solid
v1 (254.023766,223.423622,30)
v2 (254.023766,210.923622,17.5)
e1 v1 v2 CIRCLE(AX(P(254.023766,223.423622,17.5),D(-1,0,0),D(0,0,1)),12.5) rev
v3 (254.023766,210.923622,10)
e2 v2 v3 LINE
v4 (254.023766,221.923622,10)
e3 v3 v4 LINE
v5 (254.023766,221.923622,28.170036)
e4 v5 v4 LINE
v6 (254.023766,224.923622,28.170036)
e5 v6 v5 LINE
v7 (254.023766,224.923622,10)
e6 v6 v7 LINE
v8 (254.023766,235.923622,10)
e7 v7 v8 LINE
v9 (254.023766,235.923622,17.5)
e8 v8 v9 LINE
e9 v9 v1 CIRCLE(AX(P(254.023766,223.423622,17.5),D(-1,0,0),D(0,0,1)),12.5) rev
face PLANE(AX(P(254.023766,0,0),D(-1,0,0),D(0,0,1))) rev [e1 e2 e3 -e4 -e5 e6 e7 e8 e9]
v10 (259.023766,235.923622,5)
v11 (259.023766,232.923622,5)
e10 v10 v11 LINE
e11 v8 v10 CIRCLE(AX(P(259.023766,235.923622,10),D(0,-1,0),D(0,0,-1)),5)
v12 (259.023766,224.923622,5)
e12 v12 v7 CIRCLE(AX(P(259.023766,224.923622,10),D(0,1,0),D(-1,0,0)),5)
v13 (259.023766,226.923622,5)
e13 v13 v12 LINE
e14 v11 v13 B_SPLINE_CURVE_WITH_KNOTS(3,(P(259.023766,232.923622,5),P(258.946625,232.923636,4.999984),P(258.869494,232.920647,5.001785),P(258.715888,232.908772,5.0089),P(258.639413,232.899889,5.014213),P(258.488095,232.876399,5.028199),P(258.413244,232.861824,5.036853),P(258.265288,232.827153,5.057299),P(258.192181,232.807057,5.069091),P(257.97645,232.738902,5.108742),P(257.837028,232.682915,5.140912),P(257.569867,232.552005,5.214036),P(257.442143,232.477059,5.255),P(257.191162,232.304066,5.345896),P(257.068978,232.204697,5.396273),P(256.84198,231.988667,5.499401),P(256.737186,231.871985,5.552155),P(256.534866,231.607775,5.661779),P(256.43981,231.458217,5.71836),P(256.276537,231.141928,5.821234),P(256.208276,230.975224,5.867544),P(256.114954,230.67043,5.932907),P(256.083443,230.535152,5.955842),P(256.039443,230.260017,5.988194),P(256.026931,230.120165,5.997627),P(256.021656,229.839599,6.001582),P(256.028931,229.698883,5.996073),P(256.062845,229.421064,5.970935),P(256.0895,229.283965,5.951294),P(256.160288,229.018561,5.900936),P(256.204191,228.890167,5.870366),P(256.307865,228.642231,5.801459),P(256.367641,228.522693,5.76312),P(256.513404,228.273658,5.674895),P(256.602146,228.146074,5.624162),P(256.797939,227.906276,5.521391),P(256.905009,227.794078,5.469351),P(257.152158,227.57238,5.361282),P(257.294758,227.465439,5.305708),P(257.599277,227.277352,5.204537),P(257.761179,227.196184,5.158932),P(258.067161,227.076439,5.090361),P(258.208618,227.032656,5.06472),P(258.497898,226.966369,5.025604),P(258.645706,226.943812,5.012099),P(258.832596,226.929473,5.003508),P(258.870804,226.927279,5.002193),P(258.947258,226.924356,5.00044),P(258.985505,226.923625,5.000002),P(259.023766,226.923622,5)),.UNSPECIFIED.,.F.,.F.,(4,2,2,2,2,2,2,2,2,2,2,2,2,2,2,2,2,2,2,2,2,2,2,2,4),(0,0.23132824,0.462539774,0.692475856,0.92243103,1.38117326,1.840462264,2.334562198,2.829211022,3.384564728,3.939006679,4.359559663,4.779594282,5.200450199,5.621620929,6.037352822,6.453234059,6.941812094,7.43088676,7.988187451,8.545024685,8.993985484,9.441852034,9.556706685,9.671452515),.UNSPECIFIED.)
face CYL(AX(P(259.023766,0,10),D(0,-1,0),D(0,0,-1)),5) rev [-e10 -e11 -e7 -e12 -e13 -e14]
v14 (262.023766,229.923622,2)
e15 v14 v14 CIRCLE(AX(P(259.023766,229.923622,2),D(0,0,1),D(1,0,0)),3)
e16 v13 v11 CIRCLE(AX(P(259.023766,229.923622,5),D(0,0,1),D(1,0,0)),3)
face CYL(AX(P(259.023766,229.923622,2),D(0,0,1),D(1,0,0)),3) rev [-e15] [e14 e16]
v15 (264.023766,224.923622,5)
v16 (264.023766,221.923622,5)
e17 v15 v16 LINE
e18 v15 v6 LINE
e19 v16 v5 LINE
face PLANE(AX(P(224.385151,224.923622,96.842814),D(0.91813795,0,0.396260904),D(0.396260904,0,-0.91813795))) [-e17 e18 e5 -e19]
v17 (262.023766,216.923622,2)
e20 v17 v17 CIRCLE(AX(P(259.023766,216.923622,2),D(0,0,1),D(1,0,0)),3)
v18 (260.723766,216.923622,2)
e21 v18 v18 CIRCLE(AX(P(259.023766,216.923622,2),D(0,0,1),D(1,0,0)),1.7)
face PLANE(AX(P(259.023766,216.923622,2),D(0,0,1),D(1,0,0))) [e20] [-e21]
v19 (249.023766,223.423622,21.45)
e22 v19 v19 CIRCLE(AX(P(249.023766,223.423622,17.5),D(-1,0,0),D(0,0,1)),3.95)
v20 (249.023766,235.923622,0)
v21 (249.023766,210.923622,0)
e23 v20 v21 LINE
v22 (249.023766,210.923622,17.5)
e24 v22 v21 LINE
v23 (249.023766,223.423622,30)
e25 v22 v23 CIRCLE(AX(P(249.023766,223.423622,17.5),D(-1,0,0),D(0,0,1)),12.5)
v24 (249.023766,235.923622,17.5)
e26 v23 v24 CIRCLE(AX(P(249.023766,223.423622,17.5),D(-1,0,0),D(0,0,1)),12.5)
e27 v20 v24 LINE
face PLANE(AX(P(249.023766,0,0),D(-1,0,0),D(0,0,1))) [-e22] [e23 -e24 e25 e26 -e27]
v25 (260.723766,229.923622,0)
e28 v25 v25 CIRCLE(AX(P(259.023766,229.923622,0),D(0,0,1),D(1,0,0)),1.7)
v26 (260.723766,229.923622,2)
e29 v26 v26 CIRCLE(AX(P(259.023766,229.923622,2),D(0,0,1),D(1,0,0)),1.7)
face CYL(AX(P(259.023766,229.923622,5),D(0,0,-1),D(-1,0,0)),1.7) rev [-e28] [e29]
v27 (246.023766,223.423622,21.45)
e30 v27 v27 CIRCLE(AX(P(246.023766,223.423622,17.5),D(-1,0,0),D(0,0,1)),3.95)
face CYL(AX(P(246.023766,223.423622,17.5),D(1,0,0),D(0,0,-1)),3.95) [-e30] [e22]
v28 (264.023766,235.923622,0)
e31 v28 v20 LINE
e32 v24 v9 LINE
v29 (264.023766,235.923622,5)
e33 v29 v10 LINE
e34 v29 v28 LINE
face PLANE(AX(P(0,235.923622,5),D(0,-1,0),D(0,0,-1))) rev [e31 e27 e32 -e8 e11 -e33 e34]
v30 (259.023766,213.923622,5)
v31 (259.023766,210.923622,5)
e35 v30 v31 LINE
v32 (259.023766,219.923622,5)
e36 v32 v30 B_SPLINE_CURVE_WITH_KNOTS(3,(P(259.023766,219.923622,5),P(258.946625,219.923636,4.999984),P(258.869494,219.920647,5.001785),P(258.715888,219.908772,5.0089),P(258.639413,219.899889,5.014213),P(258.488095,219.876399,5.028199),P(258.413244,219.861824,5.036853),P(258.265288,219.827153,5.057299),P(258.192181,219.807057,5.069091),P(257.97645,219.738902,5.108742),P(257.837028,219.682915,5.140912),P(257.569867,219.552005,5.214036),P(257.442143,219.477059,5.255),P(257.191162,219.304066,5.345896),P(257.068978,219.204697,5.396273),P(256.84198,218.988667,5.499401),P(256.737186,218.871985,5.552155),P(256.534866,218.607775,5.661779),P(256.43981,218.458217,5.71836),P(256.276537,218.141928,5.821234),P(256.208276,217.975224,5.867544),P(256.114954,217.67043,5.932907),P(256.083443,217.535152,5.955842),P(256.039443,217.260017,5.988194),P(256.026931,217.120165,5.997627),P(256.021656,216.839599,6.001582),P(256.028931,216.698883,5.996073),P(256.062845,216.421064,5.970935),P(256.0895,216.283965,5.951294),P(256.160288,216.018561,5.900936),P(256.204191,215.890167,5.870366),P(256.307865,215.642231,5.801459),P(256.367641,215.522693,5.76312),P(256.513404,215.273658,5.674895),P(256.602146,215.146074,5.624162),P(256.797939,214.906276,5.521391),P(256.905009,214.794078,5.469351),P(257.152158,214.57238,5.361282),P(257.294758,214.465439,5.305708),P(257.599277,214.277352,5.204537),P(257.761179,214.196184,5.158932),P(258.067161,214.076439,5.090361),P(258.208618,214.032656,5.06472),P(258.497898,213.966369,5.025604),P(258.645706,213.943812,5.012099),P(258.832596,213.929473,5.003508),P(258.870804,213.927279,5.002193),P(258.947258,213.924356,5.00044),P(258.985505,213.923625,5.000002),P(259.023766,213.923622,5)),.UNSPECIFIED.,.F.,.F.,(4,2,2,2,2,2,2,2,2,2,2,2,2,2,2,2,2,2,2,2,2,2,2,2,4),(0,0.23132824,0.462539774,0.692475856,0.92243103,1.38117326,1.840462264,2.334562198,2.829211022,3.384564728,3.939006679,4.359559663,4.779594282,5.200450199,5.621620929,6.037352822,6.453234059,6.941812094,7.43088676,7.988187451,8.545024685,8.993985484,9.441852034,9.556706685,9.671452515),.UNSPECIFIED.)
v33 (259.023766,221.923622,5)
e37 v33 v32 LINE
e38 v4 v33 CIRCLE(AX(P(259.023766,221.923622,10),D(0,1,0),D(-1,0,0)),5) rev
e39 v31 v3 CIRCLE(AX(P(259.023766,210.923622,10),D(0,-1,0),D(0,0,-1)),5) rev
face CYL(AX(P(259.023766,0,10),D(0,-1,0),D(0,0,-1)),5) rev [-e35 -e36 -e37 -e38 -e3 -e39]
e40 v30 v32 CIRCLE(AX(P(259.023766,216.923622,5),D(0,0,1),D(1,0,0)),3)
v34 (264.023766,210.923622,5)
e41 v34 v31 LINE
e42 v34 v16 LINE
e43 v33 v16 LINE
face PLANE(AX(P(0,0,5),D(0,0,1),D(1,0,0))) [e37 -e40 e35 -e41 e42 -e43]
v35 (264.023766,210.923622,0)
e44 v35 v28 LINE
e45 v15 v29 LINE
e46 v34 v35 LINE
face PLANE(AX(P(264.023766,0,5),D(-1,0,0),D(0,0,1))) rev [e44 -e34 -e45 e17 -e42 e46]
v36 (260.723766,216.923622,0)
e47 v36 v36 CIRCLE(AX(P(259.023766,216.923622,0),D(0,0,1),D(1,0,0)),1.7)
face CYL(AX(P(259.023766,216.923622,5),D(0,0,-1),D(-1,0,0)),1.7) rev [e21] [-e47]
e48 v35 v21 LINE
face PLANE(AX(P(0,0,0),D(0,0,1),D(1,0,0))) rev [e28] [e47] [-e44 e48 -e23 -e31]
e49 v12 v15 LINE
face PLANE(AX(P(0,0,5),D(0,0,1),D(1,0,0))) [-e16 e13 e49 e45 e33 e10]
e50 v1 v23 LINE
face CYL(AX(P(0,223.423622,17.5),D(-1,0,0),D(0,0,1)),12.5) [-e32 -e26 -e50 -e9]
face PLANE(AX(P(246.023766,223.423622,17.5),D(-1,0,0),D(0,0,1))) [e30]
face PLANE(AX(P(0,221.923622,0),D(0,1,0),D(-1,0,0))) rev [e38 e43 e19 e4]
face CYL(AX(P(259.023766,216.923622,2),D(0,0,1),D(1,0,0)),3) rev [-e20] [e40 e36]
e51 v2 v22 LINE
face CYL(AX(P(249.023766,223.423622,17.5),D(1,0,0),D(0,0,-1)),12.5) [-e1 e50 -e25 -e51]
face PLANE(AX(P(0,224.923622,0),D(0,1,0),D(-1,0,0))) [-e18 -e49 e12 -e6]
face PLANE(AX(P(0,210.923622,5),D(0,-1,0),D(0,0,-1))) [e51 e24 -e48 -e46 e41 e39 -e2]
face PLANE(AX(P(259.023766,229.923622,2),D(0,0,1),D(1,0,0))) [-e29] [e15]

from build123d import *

# Parameters (mm, degrees)
SKETCH1_W           = 10
SKETCH1_H           = 25
SKETCH1_R           = 1.7
BOSS_EXTRUDE1_DEPTH = 5
SKETCH2_W           = 25
SKETCH2_H           = 25
SKETCH2_W_2         = 5
BOSS_EXTRUDE2_DEPTH = 5
SKETCH3_R           = 3.95
BOSS_EXTRUDE3_DEPTH = 3
SKETCH4_R           = 3
CUT_EXTRUDE1_DEPTH  = 3
FILLET1_R           = 12.5
BOSS_EXTRUDE4_DEPTH = 1.5
FILLET2_R           = 5


# Some blends are built 0.0001 mm under size
with BuildPart() as part:
    # Sketch1 → Boss-Extrude1 (new body)
    with BuildSketch(Plane.XY):
        with Locations((259.023766163, 223.42362241)):
            Rectangle(SKETCH1_W, SKETCH1_H)
        with Locations((259.023766163, 229.92362241)):
            Circle(SKETCH1_R, mode=Mode.SUBTRACT)
        with Locations((259.023766163, 216.92362241)):
            Circle(SKETCH1_R, mode=Mode.SUBTRACT)
    extrude(amount=BOSS_EXTRUDE1_DEPTH)

    # Sketch2 → Boss-Extrude2 (add)
    with BuildSketch(Plane.ZY.offset(-254.023766163)):
        with Locations((17.5, 223.42362241)):
            Rectangle(SKETCH2_W, SKETCH2_H)
        with Locations((2.5, 223.42362241)):
            Rectangle(SKETCH2_W_2, SKETCH2_H)
    extrude(amount=BOSS_EXTRUDE2_DEPTH)

    # Sketch3 → Boss-Extrude3 (add)
    with BuildSketch(Plane.ZY.offset(-249.023766163)):
        with Locations((17.5, 223.42362241)):
            Circle(SKETCH3_R)
    extrude(amount=BOSS_EXTRUDE3_DEPTH)

    # Sketch4 → Cut-Extrude1 (cut)
    with BuildSketch(Plane.XY.offset(5)):
        with Locations((259.023766163, 216.92362241)):
            Circle(SKETCH4_R)
        with Locations((259.023766163, 229.92362241)):
            Circle(SKETCH4_R)
    extrude(amount=-CUT_EXTRUDE1_DEPTH, mode=Mode.SUBTRACT)

    # Fillet1
    fillet1_edges = [part.edges().sort_by_distance(p)[0] for p in [
        (251.523766163, 210.92362241, 30),
        (251.523766163, 235.92362241, 30),
    ]]
    fillet(fillet1_edges, radius=FILLET1_R - 0.0001)  # a hair under: the kernel refuses the full size

    # Sketch5 → Boss-Extrude4 (add, symmetric)
    with BuildSketch(Plane(origin=(0, 223.42362241, 0), x_dir=(1, 0, 0), z_dir=(0, 1, 0))):
        Polygon((254.023766163, -28.1700362), (264.023766163, -5), (254.023766163, -5), (254.023766163, -17.5), align=None)
    extrude(amount=BOSS_EXTRUDE4_DEPTH, both=True)

    # Fillet2
    # the kernel refuses this fillet: 5 mm, written as the material it adds along each edge
    with BuildSketch(Plane(origin=(254.023766163, 235.92362241, 5), x_dir=(0, 0, 1), z_dir=(0, -1, 0))) as fillet2_piece_1_section:
        with BuildLine():
            CenterArc((FILLET2_R, -FILLET2_R), FILLET2_R, 90, 90)
            Line((0, -FILLET2_R), (0, 0))
            Line((0, 0), (FILLET2_R, 0))
        make_face()
    fillet2_piece_1 = extrude(amount=23.5, mode=Mode.PRIVATE)
    fillet2_piece_1 = fillet2_piece_1 - Plane(origin=(259.023766163, 229.92362241, 6.20300882), x_dir=(1, 0, 0), z_dir=(0, 0, 1)) * Cylinder(3, 68, mode=Mode.PRIVATE)
    fillet2_piece_1 = fillet2_piece_1 - Plane(origin=(259.023766163, 216.92362241, 6.20300882), x_dir=(1, 0, 0), z_dir=(0, 0, 1)) * Cylinder(3, 68, mode=Mode.PRIVATE)
    add(fillet2_piece_1)
    with BuildSketch(Plane(origin=(254.023766163, 234.42362241, 5), x_dir=(0, 0, 1), z_dir=(0, -1, 0))) as fillet2_piece_2_section:
        with BuildLine():
            CenterArc((FILLET2_R, -FILLET2_R), FILLET2_R, 90, 90)
            Line((0, -FILLET2_R), (0, 0))
            Line((0, 0), (FILLET2_R, 0))
        make_face()
    fillet2_piece_2 = extrude(amount=23.5, mode=Mode.PRIVATE)
    fillet2_piece_2 = fillet2_piece_2 - Plane(origin=(259.023766163, 229.92362241, 6.193943695), x_dir=(1, 0, 0), z_dir=(0, 0, 1)) * Cylinder(3, 67, mode=Mode.PRIVATE)
    fillet2_piece_2 = fillet2_piece_2 - Plane(origin=(259.023766163, 216.92362241, 6.193943695), x_dir=(1, 0, 0), z_dir=(0, 0, 1)) * Cylinder(3, 67, mode=Mode.PRIVATE)
    add(fillet2_piece_2)


solid = part.part
